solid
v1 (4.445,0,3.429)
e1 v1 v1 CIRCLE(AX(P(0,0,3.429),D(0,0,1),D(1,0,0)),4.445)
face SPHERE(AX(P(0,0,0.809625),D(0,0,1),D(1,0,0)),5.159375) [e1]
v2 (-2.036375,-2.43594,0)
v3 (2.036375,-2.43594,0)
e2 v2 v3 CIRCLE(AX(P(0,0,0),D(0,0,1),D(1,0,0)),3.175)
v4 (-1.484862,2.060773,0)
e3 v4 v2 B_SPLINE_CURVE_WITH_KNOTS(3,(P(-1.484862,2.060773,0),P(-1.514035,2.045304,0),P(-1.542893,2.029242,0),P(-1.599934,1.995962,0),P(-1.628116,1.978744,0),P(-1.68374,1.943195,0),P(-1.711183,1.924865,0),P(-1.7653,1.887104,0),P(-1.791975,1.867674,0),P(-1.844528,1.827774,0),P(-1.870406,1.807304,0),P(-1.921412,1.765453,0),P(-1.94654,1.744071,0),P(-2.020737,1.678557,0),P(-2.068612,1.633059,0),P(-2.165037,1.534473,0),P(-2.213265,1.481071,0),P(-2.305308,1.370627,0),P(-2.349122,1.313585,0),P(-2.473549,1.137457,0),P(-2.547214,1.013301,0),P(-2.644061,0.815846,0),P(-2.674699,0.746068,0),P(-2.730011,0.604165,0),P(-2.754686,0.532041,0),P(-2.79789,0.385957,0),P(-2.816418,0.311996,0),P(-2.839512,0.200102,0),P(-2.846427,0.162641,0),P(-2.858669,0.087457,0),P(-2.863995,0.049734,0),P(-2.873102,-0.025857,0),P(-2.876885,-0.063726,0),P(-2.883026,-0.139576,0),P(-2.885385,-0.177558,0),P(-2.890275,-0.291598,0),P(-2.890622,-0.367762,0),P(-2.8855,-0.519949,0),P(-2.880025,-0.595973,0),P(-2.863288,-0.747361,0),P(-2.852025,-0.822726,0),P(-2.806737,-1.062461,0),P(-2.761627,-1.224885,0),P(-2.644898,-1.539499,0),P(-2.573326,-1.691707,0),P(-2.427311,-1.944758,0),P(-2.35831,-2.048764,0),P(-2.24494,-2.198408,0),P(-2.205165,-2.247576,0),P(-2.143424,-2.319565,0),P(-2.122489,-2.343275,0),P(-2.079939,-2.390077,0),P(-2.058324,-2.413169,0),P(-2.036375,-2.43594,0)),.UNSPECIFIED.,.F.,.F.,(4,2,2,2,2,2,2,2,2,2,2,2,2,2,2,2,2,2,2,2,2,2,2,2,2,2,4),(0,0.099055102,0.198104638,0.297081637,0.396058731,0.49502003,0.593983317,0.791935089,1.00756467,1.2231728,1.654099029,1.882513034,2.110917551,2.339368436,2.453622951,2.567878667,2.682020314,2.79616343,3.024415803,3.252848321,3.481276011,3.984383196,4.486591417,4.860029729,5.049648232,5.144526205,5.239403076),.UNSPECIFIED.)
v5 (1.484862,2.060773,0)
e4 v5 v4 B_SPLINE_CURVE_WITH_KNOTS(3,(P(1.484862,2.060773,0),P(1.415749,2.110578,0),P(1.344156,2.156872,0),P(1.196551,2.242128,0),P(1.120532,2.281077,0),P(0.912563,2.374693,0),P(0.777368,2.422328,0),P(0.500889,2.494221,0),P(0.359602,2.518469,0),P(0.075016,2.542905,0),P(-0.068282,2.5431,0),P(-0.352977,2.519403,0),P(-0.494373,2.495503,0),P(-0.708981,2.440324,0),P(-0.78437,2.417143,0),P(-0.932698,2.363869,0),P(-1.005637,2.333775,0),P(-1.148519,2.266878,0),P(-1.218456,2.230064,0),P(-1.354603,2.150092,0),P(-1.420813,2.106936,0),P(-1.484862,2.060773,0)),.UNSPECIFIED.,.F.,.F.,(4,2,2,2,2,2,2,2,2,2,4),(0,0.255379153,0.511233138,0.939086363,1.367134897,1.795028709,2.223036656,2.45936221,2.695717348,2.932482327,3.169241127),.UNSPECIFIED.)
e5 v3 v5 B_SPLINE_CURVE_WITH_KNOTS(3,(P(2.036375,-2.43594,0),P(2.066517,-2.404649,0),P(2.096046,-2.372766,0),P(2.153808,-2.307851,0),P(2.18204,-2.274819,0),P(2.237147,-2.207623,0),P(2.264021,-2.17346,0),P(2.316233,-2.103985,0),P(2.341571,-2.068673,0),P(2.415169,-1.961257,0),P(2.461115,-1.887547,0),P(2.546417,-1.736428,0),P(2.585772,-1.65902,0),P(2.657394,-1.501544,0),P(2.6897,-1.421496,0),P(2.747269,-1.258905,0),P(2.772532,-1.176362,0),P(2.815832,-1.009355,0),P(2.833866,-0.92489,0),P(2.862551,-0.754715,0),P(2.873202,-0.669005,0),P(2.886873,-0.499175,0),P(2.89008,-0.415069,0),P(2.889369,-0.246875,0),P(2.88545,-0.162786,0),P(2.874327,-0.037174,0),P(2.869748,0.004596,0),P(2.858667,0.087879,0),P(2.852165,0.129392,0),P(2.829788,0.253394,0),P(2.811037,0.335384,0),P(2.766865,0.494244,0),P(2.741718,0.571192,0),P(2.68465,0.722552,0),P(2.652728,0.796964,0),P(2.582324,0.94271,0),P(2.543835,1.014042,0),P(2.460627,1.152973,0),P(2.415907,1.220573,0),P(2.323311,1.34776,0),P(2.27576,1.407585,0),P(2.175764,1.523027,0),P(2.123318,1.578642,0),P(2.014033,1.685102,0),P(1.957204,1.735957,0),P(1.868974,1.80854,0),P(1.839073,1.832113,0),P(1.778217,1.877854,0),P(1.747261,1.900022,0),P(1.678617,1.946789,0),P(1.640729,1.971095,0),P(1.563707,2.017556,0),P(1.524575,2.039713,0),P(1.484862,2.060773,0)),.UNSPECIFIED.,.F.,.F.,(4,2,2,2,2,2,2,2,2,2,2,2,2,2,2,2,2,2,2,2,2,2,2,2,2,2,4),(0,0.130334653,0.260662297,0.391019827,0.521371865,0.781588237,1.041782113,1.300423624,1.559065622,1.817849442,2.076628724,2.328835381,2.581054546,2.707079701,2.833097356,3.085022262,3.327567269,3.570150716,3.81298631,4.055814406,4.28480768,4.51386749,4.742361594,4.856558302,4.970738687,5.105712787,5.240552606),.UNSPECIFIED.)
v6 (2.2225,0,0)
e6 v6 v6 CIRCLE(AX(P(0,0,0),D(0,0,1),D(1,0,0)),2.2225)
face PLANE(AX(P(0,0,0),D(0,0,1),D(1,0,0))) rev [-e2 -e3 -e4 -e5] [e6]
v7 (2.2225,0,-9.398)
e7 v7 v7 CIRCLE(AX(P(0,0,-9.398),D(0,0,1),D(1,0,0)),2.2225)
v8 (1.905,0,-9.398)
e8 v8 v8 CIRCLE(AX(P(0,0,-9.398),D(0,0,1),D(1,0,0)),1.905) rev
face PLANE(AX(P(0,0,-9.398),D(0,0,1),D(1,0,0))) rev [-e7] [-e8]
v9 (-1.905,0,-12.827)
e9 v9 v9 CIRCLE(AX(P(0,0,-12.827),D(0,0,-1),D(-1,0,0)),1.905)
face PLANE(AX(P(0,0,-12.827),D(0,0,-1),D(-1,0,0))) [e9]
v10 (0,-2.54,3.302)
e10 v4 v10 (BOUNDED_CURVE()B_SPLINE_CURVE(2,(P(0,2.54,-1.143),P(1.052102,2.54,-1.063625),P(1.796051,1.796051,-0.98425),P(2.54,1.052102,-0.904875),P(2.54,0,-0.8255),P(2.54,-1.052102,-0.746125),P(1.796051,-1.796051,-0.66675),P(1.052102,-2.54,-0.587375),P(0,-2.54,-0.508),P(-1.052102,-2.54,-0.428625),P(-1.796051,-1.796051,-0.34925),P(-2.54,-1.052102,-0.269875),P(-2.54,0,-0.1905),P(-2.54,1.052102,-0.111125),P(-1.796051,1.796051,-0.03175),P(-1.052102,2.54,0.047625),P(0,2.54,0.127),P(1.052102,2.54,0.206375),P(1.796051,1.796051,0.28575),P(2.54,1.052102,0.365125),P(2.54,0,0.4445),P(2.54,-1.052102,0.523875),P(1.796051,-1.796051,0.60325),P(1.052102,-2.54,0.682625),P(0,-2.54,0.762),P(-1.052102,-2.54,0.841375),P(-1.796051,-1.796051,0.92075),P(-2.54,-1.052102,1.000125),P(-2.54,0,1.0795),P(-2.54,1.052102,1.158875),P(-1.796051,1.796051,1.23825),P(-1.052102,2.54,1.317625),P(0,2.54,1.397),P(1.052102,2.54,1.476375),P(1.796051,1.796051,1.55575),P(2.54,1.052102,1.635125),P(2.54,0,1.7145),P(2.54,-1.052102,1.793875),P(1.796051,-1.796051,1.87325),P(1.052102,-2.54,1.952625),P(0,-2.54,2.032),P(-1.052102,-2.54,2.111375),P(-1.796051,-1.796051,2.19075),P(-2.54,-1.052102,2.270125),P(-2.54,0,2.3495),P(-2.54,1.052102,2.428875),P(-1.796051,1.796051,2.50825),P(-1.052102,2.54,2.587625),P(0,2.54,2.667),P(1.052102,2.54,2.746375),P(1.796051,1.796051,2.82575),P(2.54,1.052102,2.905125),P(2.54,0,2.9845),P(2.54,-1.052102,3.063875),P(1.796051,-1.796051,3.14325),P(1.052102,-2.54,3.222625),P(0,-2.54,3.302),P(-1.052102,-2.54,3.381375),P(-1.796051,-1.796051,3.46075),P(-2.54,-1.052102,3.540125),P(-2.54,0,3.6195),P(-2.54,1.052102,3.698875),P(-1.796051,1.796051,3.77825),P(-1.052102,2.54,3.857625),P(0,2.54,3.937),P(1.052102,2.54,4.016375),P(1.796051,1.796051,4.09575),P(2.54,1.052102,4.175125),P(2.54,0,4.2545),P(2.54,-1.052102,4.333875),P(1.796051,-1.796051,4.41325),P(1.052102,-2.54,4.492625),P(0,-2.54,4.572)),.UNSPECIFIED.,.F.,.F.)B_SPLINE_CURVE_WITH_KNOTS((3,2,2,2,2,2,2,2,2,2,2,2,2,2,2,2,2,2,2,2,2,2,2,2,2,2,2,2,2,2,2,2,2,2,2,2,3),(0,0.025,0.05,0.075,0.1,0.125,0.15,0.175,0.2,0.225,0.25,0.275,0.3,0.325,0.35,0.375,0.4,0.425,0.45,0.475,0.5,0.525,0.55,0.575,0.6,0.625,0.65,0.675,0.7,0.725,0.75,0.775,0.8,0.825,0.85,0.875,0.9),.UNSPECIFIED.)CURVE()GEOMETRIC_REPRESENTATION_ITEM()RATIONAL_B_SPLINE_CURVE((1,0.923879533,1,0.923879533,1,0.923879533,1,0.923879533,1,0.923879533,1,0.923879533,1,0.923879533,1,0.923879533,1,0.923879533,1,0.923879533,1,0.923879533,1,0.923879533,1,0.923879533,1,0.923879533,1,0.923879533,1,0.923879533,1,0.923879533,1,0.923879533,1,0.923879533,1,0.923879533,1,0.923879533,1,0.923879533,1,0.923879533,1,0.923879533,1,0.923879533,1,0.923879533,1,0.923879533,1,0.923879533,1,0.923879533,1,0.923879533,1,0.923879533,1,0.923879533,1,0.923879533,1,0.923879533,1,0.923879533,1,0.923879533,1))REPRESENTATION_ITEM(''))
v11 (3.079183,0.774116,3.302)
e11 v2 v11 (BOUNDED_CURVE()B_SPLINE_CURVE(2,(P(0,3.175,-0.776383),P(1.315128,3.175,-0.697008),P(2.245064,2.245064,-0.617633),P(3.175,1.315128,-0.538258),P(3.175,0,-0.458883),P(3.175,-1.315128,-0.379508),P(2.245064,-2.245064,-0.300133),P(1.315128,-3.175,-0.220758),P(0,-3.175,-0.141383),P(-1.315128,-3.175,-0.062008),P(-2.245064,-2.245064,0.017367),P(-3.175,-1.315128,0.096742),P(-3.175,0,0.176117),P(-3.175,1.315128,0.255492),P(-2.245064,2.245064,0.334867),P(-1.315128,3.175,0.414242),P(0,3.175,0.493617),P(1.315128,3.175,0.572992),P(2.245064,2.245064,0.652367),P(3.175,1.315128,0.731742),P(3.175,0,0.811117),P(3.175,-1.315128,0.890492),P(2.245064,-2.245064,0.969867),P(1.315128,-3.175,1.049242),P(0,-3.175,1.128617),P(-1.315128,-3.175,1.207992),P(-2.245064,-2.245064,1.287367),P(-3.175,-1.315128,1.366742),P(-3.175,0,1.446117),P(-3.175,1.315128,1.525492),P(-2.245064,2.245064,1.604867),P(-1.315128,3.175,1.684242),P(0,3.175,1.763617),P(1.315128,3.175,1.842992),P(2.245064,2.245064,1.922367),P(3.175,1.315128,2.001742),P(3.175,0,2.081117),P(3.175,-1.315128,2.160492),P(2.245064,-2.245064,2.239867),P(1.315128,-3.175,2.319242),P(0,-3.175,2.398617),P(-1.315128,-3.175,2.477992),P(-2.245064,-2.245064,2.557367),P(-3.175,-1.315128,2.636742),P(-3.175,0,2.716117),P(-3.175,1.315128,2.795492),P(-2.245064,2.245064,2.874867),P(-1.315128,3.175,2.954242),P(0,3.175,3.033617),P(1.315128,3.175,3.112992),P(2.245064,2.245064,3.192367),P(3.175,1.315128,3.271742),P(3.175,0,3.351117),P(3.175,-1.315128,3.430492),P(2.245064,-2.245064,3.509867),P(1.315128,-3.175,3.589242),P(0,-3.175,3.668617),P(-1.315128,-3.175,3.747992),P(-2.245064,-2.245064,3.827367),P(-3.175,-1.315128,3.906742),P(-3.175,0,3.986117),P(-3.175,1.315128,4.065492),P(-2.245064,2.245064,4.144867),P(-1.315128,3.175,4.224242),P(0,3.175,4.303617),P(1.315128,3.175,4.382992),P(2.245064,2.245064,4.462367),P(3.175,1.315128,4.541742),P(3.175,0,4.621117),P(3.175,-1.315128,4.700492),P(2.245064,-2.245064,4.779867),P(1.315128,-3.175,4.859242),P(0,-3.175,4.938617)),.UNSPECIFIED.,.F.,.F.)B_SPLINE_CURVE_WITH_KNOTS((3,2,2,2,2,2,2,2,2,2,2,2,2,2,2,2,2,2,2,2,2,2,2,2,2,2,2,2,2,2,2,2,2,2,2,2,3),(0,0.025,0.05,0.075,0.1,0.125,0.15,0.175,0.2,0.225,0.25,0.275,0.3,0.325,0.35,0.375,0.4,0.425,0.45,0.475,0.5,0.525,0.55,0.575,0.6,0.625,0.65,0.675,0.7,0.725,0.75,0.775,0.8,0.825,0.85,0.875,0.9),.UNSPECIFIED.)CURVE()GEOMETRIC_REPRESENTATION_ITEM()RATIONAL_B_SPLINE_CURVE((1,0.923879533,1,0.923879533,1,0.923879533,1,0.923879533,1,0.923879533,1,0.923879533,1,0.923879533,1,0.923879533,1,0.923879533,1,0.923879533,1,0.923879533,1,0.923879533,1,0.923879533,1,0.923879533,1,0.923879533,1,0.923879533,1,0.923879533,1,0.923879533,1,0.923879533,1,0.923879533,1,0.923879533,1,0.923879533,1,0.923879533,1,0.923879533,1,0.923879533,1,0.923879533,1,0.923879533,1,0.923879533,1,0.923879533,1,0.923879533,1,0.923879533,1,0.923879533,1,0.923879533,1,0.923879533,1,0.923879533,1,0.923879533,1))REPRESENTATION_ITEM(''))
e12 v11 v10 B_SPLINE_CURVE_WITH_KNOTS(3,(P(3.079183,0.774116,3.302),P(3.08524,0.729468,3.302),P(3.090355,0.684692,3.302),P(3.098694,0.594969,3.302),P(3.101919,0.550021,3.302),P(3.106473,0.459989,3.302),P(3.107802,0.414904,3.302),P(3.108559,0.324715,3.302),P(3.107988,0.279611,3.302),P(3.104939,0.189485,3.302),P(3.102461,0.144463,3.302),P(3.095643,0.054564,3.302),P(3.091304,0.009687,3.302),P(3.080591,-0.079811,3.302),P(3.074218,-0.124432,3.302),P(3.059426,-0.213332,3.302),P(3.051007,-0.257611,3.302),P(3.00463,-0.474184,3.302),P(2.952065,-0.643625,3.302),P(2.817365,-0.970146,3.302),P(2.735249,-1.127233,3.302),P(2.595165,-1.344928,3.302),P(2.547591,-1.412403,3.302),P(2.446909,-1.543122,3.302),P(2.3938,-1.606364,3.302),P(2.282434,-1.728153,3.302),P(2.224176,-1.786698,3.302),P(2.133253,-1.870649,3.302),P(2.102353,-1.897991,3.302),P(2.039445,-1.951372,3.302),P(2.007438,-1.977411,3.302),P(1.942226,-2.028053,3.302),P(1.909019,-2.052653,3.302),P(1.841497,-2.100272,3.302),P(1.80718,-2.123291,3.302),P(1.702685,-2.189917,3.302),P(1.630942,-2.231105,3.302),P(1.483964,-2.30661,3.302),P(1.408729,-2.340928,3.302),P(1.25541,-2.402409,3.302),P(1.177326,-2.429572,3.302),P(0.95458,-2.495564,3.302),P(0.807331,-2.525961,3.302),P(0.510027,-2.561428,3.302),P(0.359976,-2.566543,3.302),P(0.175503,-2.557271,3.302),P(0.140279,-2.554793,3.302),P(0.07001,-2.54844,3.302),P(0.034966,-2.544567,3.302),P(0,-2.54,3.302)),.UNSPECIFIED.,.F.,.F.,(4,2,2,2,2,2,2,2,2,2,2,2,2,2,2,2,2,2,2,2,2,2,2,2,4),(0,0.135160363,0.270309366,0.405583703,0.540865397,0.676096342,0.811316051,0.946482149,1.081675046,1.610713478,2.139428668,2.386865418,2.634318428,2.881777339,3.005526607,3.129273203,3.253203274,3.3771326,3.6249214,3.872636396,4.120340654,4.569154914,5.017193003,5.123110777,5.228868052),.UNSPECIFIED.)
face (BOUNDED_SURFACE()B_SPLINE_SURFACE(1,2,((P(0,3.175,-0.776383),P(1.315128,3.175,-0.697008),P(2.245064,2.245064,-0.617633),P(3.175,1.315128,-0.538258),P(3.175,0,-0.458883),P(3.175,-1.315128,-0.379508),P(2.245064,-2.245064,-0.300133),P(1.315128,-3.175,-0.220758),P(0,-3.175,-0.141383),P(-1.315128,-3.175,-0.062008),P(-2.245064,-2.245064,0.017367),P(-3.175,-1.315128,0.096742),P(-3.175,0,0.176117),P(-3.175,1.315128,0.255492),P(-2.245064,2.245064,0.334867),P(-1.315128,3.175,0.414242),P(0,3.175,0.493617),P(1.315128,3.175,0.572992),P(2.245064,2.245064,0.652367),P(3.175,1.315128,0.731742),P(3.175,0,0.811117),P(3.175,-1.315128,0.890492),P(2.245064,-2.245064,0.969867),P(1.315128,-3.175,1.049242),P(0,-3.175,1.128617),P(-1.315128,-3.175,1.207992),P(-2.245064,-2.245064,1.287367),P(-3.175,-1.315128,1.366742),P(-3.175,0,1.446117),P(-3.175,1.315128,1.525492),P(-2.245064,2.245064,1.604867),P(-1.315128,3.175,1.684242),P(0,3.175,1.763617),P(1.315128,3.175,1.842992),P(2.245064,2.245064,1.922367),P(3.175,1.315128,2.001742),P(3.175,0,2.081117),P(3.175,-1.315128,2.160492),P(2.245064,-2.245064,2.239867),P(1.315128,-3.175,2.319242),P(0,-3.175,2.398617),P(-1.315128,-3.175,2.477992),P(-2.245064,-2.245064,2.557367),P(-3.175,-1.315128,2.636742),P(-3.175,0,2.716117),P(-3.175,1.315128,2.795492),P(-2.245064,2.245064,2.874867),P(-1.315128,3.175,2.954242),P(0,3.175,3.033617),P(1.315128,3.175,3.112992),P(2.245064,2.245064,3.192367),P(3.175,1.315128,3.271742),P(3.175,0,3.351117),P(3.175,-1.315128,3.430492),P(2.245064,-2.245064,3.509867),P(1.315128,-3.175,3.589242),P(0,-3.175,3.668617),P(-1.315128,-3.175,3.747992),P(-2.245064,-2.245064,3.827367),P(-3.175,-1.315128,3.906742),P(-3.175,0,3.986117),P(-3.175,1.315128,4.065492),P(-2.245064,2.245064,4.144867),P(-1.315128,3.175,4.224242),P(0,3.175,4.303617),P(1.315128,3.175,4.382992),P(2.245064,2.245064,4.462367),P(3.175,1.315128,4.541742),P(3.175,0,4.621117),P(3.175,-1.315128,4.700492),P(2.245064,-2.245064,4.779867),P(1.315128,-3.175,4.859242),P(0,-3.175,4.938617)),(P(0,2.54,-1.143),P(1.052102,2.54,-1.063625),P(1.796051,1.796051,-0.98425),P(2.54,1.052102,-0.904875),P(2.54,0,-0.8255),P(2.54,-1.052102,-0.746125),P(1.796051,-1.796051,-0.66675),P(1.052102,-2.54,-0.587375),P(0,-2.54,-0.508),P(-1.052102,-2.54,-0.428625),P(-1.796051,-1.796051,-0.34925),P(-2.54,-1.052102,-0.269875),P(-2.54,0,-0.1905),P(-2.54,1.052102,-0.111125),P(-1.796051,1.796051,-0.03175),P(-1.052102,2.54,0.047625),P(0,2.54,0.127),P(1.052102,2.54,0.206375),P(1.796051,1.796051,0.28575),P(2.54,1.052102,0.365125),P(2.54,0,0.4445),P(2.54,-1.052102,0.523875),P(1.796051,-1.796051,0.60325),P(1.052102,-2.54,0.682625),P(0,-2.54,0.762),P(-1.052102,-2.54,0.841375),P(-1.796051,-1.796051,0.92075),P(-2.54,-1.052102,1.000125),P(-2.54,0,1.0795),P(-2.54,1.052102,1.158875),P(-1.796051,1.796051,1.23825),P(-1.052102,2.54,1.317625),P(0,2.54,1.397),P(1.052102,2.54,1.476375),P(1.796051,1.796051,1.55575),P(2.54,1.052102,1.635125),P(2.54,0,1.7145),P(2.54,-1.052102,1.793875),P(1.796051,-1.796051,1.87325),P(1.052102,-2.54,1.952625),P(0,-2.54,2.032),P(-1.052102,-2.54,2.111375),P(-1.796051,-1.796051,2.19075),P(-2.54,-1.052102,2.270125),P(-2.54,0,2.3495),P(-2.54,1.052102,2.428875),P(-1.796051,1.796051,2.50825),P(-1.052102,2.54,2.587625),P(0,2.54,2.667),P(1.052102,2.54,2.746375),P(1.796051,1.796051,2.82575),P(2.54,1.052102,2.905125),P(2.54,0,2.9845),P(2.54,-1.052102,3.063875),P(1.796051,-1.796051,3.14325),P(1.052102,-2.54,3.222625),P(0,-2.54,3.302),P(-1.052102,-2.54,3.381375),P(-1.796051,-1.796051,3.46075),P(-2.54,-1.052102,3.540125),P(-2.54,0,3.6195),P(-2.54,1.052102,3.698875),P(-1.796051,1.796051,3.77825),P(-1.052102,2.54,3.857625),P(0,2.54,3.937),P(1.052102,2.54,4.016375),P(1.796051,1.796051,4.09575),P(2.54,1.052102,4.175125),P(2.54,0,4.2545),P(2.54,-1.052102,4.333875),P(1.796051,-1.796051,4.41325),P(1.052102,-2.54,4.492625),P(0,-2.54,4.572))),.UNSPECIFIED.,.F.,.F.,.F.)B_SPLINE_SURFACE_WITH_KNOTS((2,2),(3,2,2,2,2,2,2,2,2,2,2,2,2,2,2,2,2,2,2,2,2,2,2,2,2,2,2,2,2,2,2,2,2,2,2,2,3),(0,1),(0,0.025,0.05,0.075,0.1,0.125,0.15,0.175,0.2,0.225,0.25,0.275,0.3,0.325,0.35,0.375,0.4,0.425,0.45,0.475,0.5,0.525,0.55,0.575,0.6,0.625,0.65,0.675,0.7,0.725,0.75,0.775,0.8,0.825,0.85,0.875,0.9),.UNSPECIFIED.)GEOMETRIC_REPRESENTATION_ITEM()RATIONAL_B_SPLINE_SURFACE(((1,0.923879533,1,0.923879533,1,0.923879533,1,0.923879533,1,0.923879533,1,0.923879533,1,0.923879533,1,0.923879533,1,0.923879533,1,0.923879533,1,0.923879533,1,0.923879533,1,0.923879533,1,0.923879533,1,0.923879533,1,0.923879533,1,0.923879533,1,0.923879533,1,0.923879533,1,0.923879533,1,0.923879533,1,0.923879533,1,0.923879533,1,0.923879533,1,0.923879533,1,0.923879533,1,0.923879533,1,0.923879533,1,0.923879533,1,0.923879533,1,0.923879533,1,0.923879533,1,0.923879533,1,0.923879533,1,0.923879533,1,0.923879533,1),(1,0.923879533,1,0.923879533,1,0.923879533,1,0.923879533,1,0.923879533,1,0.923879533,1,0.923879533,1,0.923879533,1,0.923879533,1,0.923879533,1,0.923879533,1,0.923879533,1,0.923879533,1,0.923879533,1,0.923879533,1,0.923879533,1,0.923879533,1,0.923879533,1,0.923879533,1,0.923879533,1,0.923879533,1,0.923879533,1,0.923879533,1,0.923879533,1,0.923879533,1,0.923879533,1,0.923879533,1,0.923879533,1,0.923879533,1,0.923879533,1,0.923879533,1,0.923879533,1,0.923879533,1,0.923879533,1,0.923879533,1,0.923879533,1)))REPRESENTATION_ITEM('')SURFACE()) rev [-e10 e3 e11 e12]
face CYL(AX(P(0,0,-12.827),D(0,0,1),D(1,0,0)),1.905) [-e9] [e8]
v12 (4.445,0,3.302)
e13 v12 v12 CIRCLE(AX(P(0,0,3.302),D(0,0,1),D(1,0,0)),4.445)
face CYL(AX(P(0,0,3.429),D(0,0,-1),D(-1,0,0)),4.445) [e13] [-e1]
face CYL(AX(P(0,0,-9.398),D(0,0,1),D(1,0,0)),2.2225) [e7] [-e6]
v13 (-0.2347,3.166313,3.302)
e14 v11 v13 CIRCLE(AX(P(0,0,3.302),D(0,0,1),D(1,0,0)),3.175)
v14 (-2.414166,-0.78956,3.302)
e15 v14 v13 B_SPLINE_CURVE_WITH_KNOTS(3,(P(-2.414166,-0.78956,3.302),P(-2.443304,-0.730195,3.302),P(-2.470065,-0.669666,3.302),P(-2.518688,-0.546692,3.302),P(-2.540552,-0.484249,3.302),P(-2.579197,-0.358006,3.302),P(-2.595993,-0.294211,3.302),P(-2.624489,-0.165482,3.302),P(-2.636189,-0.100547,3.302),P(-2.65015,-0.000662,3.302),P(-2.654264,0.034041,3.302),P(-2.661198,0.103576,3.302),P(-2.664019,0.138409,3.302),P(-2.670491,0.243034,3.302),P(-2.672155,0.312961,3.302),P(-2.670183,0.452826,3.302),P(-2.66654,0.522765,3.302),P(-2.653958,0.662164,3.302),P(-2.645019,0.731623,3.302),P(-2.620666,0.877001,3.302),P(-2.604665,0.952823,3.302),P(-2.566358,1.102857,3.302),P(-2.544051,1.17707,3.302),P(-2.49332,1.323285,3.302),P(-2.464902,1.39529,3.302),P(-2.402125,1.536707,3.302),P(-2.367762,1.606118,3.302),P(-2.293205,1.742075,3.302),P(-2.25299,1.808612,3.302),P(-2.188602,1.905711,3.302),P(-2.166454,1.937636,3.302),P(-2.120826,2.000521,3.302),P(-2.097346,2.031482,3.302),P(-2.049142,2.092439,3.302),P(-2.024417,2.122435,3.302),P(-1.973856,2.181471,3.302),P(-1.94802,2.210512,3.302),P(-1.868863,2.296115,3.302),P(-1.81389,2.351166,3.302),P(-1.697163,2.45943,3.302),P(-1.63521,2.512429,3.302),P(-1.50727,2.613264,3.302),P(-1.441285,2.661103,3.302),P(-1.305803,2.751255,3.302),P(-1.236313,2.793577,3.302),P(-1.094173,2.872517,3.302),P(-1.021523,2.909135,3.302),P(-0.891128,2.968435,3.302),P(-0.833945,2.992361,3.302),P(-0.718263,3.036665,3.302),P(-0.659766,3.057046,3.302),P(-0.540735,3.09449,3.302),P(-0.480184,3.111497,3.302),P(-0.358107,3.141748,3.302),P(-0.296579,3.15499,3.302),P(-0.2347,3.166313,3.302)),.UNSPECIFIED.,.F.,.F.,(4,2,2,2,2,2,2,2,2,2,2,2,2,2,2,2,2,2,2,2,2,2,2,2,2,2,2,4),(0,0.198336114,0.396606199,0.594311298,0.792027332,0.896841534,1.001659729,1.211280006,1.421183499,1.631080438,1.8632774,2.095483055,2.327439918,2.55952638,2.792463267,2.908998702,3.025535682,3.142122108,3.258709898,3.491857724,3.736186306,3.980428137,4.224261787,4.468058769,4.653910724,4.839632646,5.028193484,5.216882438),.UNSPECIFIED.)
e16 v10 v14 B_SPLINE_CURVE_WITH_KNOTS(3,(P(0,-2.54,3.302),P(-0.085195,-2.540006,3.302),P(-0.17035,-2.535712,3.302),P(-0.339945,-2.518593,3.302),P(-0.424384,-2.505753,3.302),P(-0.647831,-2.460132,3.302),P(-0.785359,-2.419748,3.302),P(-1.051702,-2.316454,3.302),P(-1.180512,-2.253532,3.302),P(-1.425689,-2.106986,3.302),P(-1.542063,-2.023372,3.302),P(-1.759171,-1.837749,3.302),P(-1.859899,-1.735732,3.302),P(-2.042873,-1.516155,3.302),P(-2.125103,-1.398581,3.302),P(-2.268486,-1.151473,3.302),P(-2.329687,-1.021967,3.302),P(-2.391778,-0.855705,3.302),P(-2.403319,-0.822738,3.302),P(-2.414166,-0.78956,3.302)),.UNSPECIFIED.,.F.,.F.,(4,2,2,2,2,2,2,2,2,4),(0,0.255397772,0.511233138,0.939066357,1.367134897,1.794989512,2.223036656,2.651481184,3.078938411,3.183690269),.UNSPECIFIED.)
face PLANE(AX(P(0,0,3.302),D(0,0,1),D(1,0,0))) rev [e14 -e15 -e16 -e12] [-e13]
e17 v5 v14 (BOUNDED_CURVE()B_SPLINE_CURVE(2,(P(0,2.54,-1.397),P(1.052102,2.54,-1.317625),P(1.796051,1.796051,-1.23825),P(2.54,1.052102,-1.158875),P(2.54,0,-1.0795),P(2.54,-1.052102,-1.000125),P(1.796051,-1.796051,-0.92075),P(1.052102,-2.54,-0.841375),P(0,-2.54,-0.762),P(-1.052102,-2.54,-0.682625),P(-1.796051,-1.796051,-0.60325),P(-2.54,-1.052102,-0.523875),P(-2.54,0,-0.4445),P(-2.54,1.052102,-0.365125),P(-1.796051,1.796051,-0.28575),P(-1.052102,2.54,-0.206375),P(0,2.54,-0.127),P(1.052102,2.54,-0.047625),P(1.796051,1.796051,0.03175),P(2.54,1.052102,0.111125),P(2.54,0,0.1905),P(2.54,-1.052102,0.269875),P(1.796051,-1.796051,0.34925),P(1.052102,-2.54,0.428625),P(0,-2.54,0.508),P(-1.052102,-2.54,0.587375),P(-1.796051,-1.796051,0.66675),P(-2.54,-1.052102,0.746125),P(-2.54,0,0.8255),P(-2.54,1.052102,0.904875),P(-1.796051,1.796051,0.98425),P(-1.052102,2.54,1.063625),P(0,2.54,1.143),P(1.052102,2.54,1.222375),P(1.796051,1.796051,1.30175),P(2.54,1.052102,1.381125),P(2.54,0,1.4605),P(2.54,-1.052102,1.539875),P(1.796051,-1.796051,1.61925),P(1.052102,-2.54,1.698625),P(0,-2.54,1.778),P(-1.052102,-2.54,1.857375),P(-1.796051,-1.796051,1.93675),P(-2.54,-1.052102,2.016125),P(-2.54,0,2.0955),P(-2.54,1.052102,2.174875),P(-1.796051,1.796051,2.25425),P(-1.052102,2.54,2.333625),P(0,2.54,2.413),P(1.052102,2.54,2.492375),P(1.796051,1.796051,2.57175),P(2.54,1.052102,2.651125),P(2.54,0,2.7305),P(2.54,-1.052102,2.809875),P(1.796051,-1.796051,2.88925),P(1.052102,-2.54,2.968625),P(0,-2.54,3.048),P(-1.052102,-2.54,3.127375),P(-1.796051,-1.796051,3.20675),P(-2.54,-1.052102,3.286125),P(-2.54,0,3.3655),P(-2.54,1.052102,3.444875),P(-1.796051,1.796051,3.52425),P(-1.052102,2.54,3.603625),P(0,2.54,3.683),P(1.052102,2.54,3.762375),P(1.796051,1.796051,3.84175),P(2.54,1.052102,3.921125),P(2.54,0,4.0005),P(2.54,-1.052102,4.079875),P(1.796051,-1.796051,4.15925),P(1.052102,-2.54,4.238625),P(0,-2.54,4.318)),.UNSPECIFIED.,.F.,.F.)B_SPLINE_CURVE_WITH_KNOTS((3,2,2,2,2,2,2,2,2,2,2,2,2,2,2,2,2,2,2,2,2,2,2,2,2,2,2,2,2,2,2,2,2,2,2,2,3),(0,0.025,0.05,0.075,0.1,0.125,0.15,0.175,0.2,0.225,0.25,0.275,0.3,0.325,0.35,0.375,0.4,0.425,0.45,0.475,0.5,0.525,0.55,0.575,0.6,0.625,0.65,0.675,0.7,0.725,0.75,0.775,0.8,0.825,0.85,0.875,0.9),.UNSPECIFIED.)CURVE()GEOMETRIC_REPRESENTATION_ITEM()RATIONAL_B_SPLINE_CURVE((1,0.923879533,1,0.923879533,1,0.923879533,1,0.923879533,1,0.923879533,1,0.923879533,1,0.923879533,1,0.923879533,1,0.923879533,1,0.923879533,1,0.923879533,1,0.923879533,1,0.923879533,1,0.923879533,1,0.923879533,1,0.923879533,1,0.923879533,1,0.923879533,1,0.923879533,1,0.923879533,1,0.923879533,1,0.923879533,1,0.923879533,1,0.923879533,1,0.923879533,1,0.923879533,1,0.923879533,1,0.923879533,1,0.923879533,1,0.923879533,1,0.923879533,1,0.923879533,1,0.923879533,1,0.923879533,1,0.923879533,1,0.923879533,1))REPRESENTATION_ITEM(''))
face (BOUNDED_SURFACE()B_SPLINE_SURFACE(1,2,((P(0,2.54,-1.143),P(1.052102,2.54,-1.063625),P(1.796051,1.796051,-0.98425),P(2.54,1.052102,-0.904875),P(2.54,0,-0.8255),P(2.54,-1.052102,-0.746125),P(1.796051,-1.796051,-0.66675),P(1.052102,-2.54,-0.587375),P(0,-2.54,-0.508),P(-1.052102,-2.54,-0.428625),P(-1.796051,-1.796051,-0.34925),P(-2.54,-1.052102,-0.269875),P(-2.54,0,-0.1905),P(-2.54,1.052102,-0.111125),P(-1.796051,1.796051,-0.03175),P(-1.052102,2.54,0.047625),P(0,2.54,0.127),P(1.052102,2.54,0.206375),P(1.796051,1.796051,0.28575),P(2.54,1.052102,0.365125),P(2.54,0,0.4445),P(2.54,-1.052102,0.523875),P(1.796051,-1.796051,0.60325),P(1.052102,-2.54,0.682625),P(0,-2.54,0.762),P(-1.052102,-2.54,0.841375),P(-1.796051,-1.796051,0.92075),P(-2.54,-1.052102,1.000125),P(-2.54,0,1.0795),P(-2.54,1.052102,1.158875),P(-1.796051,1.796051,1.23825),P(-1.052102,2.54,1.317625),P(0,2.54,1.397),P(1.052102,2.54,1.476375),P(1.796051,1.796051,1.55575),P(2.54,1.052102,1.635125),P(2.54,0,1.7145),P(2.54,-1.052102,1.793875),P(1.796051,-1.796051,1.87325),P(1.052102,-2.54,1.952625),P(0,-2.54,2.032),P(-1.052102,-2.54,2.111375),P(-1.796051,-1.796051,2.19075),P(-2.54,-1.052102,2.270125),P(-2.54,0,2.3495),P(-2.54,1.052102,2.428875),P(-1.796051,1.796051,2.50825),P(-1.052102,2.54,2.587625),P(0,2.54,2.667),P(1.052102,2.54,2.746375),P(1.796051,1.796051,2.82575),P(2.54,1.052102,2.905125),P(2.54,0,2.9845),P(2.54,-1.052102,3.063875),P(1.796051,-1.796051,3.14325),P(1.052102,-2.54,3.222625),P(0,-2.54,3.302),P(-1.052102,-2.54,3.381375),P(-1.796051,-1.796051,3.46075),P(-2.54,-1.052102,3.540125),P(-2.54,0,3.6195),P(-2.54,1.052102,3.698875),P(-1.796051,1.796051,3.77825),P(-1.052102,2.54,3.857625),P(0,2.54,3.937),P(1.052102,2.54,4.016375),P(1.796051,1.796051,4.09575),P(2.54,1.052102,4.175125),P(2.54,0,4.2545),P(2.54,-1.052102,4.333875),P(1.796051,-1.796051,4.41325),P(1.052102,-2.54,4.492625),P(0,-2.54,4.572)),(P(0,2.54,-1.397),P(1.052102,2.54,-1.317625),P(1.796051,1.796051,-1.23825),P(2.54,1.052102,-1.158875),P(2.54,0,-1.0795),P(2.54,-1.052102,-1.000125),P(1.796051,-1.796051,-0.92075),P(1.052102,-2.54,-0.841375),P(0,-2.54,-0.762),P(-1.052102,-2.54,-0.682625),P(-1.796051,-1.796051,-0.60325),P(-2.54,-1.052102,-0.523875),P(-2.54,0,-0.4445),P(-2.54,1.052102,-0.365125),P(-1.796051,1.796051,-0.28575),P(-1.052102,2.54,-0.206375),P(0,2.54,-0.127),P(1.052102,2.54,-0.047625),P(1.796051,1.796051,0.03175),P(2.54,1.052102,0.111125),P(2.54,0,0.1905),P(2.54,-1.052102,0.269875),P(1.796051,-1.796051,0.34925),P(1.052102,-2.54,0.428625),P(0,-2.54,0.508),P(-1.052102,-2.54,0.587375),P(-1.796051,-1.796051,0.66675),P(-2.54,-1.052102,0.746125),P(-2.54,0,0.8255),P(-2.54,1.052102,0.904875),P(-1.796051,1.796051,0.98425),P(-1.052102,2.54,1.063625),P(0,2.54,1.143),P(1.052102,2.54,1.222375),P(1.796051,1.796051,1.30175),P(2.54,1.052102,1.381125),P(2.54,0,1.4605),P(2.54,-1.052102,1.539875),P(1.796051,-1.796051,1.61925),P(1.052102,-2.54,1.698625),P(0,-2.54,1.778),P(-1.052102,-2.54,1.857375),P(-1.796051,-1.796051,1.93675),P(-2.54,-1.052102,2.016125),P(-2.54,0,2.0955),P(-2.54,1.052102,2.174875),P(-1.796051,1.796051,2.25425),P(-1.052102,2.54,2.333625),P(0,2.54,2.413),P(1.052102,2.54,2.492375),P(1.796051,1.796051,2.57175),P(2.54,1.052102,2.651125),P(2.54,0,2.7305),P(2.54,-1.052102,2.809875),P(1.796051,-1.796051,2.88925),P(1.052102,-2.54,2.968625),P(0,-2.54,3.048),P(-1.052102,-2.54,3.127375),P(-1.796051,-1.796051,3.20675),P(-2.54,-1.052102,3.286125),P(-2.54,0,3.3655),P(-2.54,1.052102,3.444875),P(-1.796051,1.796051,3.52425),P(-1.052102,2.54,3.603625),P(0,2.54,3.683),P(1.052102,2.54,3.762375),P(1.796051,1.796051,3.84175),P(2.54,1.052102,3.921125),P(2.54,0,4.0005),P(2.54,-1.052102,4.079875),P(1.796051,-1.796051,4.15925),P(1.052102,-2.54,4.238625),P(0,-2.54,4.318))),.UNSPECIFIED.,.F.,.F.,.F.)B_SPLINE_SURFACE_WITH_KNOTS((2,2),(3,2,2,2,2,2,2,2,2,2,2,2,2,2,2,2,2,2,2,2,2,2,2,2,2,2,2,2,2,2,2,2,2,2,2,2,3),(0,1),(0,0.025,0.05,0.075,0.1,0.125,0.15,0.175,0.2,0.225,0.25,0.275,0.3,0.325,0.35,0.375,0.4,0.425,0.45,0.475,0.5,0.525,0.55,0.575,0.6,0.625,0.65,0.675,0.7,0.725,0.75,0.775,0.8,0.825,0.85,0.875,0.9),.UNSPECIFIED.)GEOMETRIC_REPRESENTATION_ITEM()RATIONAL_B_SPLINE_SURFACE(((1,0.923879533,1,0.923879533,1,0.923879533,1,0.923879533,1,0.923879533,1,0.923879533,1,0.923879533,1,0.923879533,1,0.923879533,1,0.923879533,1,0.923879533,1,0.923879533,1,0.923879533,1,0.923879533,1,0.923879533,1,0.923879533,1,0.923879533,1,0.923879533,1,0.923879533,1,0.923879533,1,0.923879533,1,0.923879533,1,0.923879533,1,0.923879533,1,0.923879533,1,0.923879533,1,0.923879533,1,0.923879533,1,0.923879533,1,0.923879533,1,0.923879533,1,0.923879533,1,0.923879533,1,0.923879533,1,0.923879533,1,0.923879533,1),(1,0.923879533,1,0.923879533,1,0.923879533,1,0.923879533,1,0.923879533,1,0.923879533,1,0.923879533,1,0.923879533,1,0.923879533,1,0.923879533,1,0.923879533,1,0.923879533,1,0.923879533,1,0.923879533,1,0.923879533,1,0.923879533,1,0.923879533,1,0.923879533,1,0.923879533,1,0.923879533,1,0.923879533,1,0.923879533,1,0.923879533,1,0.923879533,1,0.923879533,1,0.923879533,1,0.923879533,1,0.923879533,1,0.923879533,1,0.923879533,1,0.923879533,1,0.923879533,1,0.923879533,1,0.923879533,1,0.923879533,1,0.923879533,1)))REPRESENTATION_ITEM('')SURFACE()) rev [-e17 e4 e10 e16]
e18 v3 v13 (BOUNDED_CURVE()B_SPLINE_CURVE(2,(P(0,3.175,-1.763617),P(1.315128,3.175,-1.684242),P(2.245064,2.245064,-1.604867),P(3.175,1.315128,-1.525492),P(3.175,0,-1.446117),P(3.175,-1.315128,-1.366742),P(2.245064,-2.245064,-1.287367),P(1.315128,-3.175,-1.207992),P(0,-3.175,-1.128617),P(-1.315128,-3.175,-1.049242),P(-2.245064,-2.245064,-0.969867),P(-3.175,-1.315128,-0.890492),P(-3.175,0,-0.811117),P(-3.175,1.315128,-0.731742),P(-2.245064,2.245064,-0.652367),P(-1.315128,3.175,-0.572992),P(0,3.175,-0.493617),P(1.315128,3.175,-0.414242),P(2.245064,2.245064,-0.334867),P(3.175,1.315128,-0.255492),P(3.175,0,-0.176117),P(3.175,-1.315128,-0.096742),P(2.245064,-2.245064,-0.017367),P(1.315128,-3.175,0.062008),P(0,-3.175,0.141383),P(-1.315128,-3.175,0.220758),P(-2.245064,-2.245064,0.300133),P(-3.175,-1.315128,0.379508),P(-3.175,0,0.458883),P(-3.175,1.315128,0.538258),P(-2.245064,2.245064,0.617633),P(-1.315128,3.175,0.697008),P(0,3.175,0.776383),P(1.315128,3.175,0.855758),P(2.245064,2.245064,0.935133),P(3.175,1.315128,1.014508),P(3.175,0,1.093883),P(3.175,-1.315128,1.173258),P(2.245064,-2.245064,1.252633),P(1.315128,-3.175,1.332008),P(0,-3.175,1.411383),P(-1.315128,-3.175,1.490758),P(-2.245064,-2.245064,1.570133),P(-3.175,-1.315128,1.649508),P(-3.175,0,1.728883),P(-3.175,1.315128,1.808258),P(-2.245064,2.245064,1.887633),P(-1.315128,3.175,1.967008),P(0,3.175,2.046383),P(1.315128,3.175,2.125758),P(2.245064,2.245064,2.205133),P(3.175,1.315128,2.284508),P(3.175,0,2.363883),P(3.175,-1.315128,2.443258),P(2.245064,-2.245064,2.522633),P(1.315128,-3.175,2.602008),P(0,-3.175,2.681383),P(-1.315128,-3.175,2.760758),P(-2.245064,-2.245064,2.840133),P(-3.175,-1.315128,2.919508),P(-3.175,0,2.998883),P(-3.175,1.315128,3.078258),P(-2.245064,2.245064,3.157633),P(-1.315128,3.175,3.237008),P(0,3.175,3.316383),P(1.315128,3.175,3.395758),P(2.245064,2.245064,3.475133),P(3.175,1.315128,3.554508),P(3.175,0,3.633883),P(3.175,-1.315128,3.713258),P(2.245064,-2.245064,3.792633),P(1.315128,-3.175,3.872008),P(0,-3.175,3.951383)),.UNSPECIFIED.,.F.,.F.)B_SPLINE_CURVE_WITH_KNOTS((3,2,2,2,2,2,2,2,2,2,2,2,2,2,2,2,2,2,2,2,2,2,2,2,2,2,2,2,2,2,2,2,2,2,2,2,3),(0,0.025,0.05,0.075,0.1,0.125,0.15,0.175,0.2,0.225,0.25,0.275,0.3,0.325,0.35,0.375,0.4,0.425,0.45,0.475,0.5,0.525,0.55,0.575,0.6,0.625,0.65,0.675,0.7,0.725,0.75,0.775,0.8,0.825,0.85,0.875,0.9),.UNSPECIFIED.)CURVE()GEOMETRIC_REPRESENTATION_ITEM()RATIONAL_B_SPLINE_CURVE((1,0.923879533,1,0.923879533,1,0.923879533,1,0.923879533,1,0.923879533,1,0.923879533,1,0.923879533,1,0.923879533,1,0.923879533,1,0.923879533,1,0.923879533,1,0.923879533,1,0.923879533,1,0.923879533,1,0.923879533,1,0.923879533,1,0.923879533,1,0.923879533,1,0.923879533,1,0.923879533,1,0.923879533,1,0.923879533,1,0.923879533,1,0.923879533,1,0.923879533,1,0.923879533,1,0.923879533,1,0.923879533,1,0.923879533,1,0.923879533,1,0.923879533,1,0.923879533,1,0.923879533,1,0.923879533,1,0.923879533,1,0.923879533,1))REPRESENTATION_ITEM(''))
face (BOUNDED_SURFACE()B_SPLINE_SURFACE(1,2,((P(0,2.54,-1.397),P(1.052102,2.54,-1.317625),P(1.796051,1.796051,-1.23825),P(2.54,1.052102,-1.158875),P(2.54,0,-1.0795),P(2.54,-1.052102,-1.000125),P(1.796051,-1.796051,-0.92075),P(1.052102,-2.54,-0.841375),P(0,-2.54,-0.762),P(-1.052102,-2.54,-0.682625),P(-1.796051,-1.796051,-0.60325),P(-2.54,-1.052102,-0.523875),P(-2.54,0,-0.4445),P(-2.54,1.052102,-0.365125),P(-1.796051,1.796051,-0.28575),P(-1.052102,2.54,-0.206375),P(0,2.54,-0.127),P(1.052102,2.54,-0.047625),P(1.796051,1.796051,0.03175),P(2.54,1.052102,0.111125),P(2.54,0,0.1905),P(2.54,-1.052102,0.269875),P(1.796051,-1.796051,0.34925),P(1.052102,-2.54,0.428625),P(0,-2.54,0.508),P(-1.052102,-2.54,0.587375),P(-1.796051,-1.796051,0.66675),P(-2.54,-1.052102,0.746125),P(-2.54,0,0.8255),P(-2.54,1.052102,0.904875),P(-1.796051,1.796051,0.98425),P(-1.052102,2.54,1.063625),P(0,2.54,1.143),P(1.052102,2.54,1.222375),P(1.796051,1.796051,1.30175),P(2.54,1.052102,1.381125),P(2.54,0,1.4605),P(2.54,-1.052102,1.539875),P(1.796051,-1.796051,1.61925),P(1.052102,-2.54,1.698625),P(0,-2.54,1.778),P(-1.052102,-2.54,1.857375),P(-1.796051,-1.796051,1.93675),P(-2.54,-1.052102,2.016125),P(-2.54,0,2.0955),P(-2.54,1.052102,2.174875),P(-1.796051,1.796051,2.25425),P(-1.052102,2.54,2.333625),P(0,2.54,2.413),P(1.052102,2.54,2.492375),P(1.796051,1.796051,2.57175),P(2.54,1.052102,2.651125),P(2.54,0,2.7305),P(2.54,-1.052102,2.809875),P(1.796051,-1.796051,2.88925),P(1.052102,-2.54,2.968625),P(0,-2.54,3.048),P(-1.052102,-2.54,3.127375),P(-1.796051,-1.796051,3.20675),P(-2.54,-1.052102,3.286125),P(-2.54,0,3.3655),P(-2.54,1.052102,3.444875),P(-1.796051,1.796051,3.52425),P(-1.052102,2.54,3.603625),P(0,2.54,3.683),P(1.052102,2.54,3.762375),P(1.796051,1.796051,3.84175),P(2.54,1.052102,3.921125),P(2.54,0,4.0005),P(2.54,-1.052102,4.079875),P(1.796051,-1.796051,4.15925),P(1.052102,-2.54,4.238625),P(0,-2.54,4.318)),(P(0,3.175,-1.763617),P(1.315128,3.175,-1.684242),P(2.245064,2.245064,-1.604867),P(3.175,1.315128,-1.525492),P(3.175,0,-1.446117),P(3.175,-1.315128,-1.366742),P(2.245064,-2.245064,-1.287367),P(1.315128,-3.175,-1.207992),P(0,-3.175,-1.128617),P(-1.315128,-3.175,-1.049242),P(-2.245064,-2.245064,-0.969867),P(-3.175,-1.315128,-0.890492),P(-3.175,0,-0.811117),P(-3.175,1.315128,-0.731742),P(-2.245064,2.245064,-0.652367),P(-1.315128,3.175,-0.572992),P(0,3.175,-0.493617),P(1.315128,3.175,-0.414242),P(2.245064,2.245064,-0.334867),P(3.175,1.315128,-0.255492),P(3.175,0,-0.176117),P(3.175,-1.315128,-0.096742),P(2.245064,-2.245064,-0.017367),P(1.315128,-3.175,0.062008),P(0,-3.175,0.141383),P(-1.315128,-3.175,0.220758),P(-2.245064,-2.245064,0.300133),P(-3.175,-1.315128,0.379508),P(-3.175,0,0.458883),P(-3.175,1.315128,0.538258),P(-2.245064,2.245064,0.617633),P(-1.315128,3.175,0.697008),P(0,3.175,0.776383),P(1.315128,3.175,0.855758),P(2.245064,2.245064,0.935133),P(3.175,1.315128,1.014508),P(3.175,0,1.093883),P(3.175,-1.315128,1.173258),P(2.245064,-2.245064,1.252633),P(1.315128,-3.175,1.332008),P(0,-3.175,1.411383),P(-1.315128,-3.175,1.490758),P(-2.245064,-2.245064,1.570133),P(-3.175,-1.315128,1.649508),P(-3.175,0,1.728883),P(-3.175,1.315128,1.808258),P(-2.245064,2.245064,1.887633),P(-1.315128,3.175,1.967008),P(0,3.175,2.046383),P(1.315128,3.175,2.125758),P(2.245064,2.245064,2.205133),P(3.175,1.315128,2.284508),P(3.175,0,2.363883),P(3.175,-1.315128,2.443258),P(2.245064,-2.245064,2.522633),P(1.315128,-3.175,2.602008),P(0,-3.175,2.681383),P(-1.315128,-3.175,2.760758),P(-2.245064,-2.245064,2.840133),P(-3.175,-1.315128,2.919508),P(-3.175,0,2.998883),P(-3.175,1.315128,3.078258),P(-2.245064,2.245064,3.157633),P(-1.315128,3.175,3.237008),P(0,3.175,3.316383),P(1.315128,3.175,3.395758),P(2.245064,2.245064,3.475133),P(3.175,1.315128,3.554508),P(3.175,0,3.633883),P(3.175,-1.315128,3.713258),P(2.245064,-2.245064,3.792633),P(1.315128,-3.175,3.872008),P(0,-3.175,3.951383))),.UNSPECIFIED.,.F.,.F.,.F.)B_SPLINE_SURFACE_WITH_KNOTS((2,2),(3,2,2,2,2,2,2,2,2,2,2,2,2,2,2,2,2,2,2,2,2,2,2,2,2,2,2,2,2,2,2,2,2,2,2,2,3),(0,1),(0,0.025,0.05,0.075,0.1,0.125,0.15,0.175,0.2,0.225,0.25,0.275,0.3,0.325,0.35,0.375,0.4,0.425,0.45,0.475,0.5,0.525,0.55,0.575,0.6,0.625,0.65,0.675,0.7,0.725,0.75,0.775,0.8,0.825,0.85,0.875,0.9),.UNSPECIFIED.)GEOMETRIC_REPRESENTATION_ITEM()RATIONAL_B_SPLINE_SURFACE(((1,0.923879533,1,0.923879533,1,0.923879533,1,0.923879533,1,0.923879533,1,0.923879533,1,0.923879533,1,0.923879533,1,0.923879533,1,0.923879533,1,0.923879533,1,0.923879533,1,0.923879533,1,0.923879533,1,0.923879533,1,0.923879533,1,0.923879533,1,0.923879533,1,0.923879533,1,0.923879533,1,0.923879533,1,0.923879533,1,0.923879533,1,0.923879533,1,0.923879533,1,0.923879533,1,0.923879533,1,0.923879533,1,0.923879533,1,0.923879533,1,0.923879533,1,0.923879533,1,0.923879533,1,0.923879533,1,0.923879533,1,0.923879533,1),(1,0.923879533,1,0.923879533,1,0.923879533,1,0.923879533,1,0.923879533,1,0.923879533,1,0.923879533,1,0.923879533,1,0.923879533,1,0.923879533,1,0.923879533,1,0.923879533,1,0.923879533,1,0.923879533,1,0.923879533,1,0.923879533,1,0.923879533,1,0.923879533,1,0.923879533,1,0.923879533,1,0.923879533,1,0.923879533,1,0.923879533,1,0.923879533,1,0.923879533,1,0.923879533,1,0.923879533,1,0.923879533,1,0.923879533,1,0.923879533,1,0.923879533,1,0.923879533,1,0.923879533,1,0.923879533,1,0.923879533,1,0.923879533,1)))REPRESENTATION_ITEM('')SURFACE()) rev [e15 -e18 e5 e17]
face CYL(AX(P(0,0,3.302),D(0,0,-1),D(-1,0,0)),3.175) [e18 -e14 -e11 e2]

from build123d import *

# Parameters (mm, degrees)
SKETCH3_R           = 3.175
BOSS_EXTRUDE1_DEPTH = 3.302
CUT_SWEEP1_PITCH    = 1.27
SKETCH8_R           = 2.2225
BOSS_EXTRUDE3_DEPTH = 9.398
SKETCH10_R          = 1.905
BOSS_EXTRUDE5_DEPTH = 3.429
SKETCH11_R          = 4.445
BOSS_EXTRUDE6_DEPTH = 0.127
DOME1_FACE_RADIUS   = 4.445
DOME1_HEIGHT        = 2.54


with BuildPart() as part:
    # Sketch3 → Boss-Extrude1 (new body)
    with BuildSketch(Plane.XY):
        with Locations(Location((0, 0, 0), (0, 0, 180))):
            Circle(SKETCH3_R)
    extrude(amount=BOSS_EXTRUDE1_DEPTH)

    # Cut-Sweep1: arcs per turn and ends read off the stored shape
    # Cut-Sweep1: the profile of Sketch5 profile screwed along a left-hand helix through 4.5 turns, 8 arcs to a turn; built about Z, then put on its axis
    cut_sweep1_z = Axis((0, 0, 0), (0, 0, 1))
    cut_sweep1_corners = [(2.54, 0, -1.397), (3.1753, 0, -1.763790626), (3.1753, 0, -0.776209374), (2.54, 0, -1.143)]
    with BuildLine(mode=Mode.PRIVATE) as cut_sweep1_profile:
        Line(cut_sweep1_corners[0], cut_sweep1_corners[1])
        Line(cut_sweep1_corners[1], cut_sweep1_corners[2])
        Line(cut_sweep1_corners[2], cut_sweep1_corners[3])
        Line(cut_sweep1_corners[3], cut_sweep1_corners[0])
    cut_sweep1_cap = Face(cut_sweep1_profile.wire())
    cut_sweep1_turn_angles = [0, -22.5, -45, -67.5, -90, -112.5, -135, -157.5, -180, -202.5, -225, -247.5, -270, -292.5, -315, -337.5, -360]
    cut_sweep1_turn_weights = [1, 0.9238795325112867, 1, 0.9238795325112867, 1, 0.9238795325112867, 1, 0.9238795325112867, 1, 0.9238795325112867, 1, 0.9238795325112867, 1, 0.9238795325112867, 1, 0.9238795325112867, 1]
    cut_sweep1_turn_rails = [Edge.make_bspline([Vector(p[0], p[1], 0).rotate(cut_sweep1_z, cut_sweep1_turn_angles[k]) / cut_sweep1_turn_weights[k] + Vector(0, 0, p[2] + -CUT_SWEEP1_PITCH * cut_sweep1_turn_angles[k] / 360) for k in range(17)], [0, 0, 0, 1, 1, 2, 2, 3, 3, 4, 4, 5, 5, 6, 6, 7, 7, 8, 8, 8], 2, cut_sweep1_turn_weights) for p in cut_sweep1_corners]
    cut_sweep1_turn_sides = [Face.make_surface_from_curves(cut_sweep1_turn_rails[p[0]], cut_sweep1_turn_rails[p[1]]) for p in [(0, 1), (1, 2), (2, 3), (3, 0)]]
    cut_sweep1_last_angles = [-1440, -1462.5, -1485, -1507.5, -1530, -1552.5, -1575, -1597.5, -1620]
    cut_sweep1_last_weights = [1, 0.9238795325112867, 1, 0.9238795325112867, 1, 0.9238795325112867, 1, 0.9238795325112867, 1]
    cut_sweep1_last_rails = [Edge.make_bspline([Vector(p[0], p[1], 0).rotate(cut_sweep1_z, cut_sweep1_last_angles[k]) / cut_sweep1_last_weights[k] + Vector(0, 0, p[2] + -CUT_SWEEP1_PITCH * cut_sweep1_last_angles[k] / 360) for k in range(9)], [0, 0, 0, 1, 1, 2, 2, 3, 3, 4, 4, 4], 2, cut_sweep1_last_weights) for p in cut_sweep1_corners]
    cut_sweep1_last_sides = [Face.make_surface_from_curves(cut_sweep1_last_rails[p[0]], cut_sweep1_last_rails[p[1]]) for p in [(0, 1), (1, 2), (2, 3), (3, 0)]]
    cut_sweep1 = Plane(origin=(0, 0, 0), x_dir=(0, 1, 0), z_dir=(0, 0, 1)) * Solid(Shell([*[p.moved(Location((0, 0, CUT_SWEEP1_PITCH * i))) for i in range(4) for p in cut_sweep1_turn_sides], *cut_sweep1_last_sides, cut_sweep1_cap, cut_sweep1_cap.rotate(cut_sweep1_z, -1620).moved(Location((0, 0, -CUT_SWEEP1_PITCH * -1620 / 360)))]))
    add(cut_sweep1, mode=Mode.SUBTRACT)

    # Sketch8 → Boss-Extrude3 (add)
    with BuildSketch(Plane.XY):
        Circle(SKETCH8_R)
    extrude(amount=-BOSS_EXTRUDE3_DEPTH)

    # Sketch10 → Boss-Extrude5 (add)
    with BuildSketch(Plane(origin=(0, 0, -9.398), x_dir=(-1, 0, 0), z_dir=(0, 0, -1))):
        with Locations(Location((0, 0, 0), (0, 0, 180))):
            Circle(SKETCH10_R)
    extrude(amount=BOSS_EXTRUDE5_DEPTH)

    # Sketch11 → Boss-Extrude6 (add)
    with BuildSketch(Plane.XY.offset(3.302)):
        Circle(SKETCH11_R)
    extrude(amount=BOSS_EXTRUDE6_DEPTH)

    # Dome1: a dome of height H over a round flat face of radius A is a cap of a sphere of radius (A * A + H * H) / (2 * H)
    dome1_r = (DOME1_FACE_RADIUS * DOME1_FACE_RADIUS + DOME1_HEIGHT * DOME1_HEIGHT) / (2 * DOME1_HEIGHT)
    dome1_base = Plane((0, 0, 3.429), z_dir=(0, 0, 1))
    with Locations(dome1_base.offset(DOME1_HEIGHT - dome1_r)):
        dome1_ball = Sphere(dome1_r, mode=Mode.PRIVATE)
    add(split(dome1_ball, bisect_by=dome1_base, keep=Keep.TOP, mode=Mode.PRIVATE))


solid = part.part
